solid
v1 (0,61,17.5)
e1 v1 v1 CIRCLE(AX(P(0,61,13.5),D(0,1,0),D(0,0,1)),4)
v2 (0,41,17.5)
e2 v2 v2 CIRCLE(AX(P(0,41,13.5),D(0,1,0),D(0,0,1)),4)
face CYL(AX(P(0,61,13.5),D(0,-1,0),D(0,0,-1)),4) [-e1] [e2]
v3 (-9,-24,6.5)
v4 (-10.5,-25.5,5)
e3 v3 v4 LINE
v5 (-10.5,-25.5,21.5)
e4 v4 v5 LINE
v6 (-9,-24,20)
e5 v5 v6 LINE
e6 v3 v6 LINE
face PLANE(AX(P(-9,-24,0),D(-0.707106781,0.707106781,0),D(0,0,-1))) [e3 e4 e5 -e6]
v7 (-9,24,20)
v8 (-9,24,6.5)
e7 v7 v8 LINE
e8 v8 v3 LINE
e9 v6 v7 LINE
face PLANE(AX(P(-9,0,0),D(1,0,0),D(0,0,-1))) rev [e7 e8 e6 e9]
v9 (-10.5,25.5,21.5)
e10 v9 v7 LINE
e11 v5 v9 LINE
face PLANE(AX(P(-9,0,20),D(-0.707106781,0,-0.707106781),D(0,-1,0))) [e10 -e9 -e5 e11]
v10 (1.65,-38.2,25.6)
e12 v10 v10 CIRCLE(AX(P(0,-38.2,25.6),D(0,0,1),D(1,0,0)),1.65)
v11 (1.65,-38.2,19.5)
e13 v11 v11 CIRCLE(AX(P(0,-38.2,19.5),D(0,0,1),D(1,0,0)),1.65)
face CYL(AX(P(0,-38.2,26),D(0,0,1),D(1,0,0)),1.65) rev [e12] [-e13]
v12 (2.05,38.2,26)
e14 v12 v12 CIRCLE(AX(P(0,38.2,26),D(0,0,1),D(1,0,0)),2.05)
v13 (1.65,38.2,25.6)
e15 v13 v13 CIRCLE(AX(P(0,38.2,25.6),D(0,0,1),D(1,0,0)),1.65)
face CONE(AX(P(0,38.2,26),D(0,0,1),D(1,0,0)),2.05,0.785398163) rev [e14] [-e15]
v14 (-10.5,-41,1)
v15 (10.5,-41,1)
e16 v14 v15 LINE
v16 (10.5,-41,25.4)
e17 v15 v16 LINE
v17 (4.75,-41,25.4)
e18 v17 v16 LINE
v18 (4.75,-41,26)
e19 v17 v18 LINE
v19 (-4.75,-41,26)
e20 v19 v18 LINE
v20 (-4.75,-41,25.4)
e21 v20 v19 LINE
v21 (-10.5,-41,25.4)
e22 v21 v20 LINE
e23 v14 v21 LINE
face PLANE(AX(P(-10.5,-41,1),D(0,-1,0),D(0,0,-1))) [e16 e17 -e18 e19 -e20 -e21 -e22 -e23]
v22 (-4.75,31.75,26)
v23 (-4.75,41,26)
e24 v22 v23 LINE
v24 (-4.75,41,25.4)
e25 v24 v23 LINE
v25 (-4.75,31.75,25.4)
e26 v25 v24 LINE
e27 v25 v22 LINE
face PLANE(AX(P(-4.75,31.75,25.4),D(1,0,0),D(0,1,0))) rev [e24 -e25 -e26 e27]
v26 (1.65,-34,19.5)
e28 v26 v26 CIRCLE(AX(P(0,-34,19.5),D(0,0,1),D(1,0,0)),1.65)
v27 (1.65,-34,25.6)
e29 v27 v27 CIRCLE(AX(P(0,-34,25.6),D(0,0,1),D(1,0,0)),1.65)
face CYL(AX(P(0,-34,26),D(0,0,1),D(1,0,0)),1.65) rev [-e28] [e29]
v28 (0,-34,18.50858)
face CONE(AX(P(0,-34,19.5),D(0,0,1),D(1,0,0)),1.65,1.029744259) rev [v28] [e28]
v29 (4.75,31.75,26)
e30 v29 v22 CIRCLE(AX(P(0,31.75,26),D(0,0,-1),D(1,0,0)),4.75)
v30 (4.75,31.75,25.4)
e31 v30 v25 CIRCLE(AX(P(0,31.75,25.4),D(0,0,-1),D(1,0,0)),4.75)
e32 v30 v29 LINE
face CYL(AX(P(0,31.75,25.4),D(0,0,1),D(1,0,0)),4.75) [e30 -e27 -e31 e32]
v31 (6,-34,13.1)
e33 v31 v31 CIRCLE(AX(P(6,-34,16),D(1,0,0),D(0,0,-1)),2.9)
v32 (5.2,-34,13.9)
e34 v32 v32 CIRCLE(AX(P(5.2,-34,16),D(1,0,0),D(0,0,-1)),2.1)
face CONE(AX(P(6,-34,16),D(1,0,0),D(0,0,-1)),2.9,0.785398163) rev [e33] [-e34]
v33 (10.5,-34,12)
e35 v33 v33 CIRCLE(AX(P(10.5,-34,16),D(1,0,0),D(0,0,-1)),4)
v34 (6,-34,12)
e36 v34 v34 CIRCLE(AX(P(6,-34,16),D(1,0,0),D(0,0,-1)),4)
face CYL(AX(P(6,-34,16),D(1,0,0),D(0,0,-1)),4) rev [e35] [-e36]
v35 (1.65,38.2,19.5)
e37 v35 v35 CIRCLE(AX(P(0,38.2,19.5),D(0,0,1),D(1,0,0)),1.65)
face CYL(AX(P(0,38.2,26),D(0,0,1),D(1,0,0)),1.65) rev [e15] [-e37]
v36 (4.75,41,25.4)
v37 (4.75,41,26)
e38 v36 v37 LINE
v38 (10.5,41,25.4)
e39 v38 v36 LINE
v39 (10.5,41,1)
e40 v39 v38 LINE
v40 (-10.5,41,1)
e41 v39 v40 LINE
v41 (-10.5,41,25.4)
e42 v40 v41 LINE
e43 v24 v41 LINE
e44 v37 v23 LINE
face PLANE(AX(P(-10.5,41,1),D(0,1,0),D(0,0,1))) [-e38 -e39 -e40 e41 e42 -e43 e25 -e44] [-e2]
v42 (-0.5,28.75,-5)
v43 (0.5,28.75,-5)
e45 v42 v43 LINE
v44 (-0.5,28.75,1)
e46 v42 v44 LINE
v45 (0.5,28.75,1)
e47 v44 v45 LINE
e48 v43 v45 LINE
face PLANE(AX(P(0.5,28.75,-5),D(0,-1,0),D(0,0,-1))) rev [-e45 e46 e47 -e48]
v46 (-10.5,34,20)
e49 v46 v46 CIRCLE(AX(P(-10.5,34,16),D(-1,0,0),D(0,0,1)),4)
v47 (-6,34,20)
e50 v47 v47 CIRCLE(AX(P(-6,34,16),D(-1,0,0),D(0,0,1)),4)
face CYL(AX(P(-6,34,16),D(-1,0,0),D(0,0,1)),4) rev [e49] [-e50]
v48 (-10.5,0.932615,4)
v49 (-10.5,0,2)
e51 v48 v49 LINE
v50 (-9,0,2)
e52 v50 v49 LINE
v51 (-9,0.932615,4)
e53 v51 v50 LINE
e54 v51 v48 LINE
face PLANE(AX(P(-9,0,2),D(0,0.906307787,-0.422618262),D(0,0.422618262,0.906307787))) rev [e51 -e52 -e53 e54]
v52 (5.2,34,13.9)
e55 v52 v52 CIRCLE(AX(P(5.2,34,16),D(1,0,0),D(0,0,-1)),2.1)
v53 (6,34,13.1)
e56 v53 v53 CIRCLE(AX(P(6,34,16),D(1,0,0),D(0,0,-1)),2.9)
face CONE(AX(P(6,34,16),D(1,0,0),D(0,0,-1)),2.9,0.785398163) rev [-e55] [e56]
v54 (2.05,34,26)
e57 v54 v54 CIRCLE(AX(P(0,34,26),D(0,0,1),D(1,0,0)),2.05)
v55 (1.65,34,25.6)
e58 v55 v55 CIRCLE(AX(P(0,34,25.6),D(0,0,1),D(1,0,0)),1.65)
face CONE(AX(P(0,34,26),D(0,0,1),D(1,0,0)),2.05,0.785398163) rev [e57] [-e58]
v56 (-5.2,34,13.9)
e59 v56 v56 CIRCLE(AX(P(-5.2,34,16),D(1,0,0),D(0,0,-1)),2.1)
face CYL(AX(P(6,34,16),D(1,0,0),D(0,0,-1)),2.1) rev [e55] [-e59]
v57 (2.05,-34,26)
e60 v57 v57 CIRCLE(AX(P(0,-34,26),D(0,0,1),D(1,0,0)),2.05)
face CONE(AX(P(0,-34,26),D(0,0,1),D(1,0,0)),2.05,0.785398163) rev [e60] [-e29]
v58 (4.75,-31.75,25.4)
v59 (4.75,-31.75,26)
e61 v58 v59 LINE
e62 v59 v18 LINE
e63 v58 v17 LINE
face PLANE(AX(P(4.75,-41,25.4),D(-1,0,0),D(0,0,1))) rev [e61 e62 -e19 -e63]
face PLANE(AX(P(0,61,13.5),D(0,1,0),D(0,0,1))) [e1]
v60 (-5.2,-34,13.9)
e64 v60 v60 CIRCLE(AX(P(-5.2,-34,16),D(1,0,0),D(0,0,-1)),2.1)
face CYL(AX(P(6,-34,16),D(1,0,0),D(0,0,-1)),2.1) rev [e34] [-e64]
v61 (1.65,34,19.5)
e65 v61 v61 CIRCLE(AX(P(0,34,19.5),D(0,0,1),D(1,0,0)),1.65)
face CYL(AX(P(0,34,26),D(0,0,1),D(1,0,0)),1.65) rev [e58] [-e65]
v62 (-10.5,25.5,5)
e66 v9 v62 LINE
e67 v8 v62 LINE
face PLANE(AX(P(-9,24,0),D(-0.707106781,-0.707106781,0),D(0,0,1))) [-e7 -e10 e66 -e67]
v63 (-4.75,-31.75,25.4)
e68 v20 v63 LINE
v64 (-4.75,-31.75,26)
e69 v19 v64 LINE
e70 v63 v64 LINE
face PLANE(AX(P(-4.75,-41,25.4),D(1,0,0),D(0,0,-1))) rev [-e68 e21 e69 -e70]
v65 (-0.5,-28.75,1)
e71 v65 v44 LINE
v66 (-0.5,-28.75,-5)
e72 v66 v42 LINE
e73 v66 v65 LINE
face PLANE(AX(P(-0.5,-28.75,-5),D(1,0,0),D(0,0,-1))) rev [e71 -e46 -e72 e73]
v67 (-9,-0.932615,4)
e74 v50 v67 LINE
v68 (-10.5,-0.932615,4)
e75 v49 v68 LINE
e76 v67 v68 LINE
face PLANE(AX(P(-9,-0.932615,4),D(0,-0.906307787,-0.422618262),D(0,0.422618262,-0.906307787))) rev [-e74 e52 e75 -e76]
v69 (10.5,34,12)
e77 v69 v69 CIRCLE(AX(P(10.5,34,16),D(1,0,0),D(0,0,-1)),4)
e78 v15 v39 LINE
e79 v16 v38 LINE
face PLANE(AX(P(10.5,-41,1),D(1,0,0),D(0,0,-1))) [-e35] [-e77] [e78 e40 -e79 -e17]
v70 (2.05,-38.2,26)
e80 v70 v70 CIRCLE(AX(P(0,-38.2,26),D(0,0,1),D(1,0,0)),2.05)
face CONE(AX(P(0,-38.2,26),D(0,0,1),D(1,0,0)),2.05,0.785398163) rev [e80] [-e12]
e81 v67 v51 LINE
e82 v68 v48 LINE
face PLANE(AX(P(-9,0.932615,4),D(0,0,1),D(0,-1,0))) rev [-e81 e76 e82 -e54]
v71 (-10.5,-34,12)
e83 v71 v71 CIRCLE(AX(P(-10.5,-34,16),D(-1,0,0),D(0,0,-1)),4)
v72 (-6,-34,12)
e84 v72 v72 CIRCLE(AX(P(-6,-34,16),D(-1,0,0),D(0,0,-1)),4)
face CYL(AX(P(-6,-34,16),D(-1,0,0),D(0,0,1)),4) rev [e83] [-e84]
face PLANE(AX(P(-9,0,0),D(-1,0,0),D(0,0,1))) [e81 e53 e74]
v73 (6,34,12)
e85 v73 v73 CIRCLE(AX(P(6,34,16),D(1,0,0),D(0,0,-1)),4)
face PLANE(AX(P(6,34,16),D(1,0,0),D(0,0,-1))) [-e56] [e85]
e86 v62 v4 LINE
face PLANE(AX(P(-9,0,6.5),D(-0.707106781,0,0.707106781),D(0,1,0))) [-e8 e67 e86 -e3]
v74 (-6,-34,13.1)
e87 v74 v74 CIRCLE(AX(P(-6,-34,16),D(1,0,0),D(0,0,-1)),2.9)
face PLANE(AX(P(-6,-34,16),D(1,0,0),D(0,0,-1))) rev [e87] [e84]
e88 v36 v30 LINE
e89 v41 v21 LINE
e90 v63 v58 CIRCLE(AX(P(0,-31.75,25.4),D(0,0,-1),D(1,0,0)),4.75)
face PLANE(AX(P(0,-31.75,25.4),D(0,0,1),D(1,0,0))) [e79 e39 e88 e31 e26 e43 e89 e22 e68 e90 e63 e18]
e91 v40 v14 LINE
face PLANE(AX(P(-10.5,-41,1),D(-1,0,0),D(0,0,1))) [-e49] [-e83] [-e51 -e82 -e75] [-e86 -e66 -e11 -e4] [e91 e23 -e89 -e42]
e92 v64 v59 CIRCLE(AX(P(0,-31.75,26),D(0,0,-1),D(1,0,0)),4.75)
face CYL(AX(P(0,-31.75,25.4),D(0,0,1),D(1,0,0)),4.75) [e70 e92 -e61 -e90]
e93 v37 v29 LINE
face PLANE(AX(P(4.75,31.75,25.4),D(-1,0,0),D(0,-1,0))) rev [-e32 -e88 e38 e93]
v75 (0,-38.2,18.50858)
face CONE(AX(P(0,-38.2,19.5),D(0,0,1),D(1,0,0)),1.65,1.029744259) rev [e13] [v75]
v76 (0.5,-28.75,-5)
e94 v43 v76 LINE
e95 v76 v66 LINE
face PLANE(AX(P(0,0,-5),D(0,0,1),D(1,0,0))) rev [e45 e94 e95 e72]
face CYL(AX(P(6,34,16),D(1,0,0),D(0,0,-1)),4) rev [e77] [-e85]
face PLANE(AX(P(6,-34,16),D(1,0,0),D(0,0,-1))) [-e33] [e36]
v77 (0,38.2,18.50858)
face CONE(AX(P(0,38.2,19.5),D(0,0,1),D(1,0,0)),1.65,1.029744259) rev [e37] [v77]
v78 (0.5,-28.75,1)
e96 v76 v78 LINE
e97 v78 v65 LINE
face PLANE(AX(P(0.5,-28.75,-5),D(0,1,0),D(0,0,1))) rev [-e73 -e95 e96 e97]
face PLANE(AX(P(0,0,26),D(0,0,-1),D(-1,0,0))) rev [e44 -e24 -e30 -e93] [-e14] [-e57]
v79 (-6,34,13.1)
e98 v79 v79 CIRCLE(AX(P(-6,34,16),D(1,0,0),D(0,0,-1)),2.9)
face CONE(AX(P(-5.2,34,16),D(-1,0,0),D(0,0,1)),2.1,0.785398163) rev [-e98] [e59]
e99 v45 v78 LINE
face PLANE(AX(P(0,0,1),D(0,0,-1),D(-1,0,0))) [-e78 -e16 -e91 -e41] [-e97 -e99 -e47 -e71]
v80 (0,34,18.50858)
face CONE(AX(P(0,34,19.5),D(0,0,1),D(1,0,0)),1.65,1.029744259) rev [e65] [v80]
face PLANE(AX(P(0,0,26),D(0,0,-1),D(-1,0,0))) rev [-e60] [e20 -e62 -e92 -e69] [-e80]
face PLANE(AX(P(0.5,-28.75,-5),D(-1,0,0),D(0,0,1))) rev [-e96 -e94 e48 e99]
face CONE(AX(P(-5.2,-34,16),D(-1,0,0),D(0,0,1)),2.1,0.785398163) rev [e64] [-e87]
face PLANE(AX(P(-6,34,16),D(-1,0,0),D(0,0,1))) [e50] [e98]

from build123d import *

# Parameters (mm, degrees)
SKETCH_2_W                  = 1
SKETCH_2_H                  = 57.5
EXTRUDE_2_DEPTH             = 8
EXTRUDE_3_DEPTH             = 23
EXTRUDE_3_DEPTH_BACK        = 2
SKETCH_3_W                  = 21
SKETCH_3_H                  = 82
SKETCH_4_R                  = 4
EXTRUDE_4_DEPTH             = 20
SKETCH_5_R                  = 4
CUT_EXTRUDE_1_DEPTH         = 4.5
CUT_EXTRUDE_START           = -4.5
SKETCH_6_R                  = 4
CUT_EXTRUDE_2_DEPTH         = 4.5
HOLE_WIZARD_M51_AT_2_COUNT  = 2
HOLE_WIZARD_M51_AT_2_PITCH  = 68
CUT_EXTRUDE_3_DEPTH         = 0.6
HOLE_WIZARD_M41_D           = 3.3
HOLE_WIZARD_M41_DEPTH       = 6.5
HOLE_WIZARD_M41_CSINK_D     = 4.1
HOLE_WIZARD_M41_CSINK_ANGLE = 90
HOLE_WIZARD_M41_TIP         = 0.991420021
SKETCH_12_W                 = 16.5
SKETCH_12_H                 = 51
CUT_EXTRUDE_4_DEPTH         = 1.5
CHAMFER_1_SIZE              = 1.5


with BuildPart() as part:
    # Эскиз2 → Бобышка-Вытянуть2 (new body)
    with BuildSketch(Plane(origin=(0, 0, 3), x_dir=(-1, 0, 0), z_dir=(0, 0, -1))):
        Rectangle(SKETCH_2_W, SKETCH_2_H)
    extrude(amount=EXTRUDE_2_DEPTH)

    # Эскиз3 → Бобышка-Вытянуть3 (add, two sides: drawn at the far end of the back side and taken through both)
    with BuildSketch(Plane.XY.offset(3).offset(-EXTRUDE_3_DEPTH_BACK)):
        Rectangle(SKETCH_3_W, SKETCH_3_H)
    extrude(amount=EXTRUDE_3_DEPTH + EXTRUDE_3_DEPTH_BACK)

    # Эскиз4 → Бобышка-Вытянуть4 (add)
    with BuildSketch(Plane(origin=(0, 41, 0), x_dir=(1, 0, 0), z_dir=(0, 1, 0))):
        with Locations(Location((0, -13.5, 0), (0, 0, 270))):
            Circle(SKETCH_4_R)
    extrude(amount=EXTRUDE_4_DEPTH)

    # Эскиз5 → Вырез-Вытянуть1 (cut)
    with BuildSketch(Plane.ZY.offset(10.5)):
        with Locations((16, 34)):
            Circle(SKETCH_5_R)
        with Locations(Location((16, -34, 0), (0, 0, 180))):
            Circle(SKETCH_5_R)
    extrude(amount=-CUT_EXTRUDE_1_DEPTH, mode=Mode.SUBTRACT)

    # Эскиз6 → Вырез-Вытянуть2 (cut)
    with BuildSketch(Plane(origin=(10.5, 0, 0), x_dir=(0, 0, -1), z_dir=(1, 0, 0)).offset(CUT_EXTRUDE_START)):
        with Locations(Location((-16, 34, 0), (0, 0, 180))):
            Circle(SKETCH_6_R)
        with Locations((-16, -34)):
            Circle(SKETCH_6_R)
    extrude(amount=CUT_EXTRUDE_2_DEPTH, mode=Mode.SUBTRACT)

    # Эскиз8 → Отверстие обработанное метчиком M51 (revolve, cut)
    with BuildSketch(Plane(origin=(6, 34, 16), x_dir=(0, 0, -1), z_dir=(0, 1, 0))):
        Polygon((0, 0), (0, 12), (2.9, 12), (2.1, 11.2), (2.1, 0.8), (2.9, 0), align=None)
    hole_wizard_m51 = revolve(axis=Axis((12.35, 34, 16), (-1, 0, 0)), mode=Mode.SUBTRACT)

    # Отверстие обработанное метчиком M51 at 2: Отверстие обработанное метчиком M51 ×2
    with Locations(*[(0, -i * HOLE_WIZARD_M51_AT_2_PITCH, 0) for i in range(1, HOLE_WIZARD_M51_AT_2_COUNT)]):
        add(hole_wizard_m51, mode=Mode.SUBTRACT)

    # Эскиз9 → Вырез-Вытянуть3 (cut)
    with BuildSketch(Plane.XY.offset(26)):
        with BuildLine():
            Line((-4.75, 31.75), (-4.75, 41))
            Line((-4.75, 41), (-10.5, 41))
            Line((-10.5, 41), (-10.5, -41))
            Line((-10.5, -41), (-4.75, -41))
            Line((-4.75, -41), (-4.75, -31.75))
            ThreePointArc((-4.75, -31.75), (0, -27), (4.75, -31.75))
            Line((4.75, -31.75), (4.75, -41))
            Line((4.75, -41), (10.5, -41))
            Line((10.5, -41), (10.5, 41))
            Line((10.5, 41), (4.75, 41))
            Line((4.75, 41), (4.75, 31.75))
            ThreePointArc((4.75, 31.75), (0, 27), (-4.75, 31.75))
        make_face()
    extrude(amount=-CUT_EXTRUDE_3_DEPTH, mode=Mode.SUBTRACT)

    # Отверстие обработанное метчиком M41
    with Locations(Plane.XY.offset(26)):
        with Locations((0, 38.2), (0, 34), (0, -34), (0, -38.2)):
            CounterSinkHole(HOLE_WIZARD_M41_D / 2, HOLE_WIZARD_M41_CSINK_D / 2, depth=HOLE_WIZARD_M41_DEPTH, counter_sink_angle=HOLE_WIZARD_M41_CSINK_ANGLE)
            with Locations((0, 0, -(HOLE_WIZARD_M41_DEPTH + HOLE_WIZARD_M41_TIP / 2))):  # 118° drill point
                Cone(0, HOLE_WIZARD_M41_D / 2, HOLE_WIZARD_M41_TIP, mode=Mode.SUBTRACT)

    # Эскиз12 → Вырез-Вытянуть4 (cut)
    with BuildSketch(Plane.ZY.offset(10.5)):
        Polygon((2, 0), (4, 0.932615316), (4, -0.932615316), align=None)
        with Locations((13.25, 0)):
            Rectangle(SKETCH_12_W, SKETCH_12_H)
    extrude(amount=-CUT_EXTRUDE_4_DEPTH, mode=Mode.SUBTRACT)

    # Фаска1
    chamfer_1_edges = [part.edges().sort_by_distance(p)[0] for p in [
        (-9, -25.5, 13.25),
        (-9, 0, 5),
        (-9, 25.5, 13.25),
        (-9, 0, 21.5),
    ]]
    chamfer(chamfer_1_edges, length=CHAMFER_1_SIZE - 0.0001)  # a hair under: the kernel refuses the full size


solid = part.part
